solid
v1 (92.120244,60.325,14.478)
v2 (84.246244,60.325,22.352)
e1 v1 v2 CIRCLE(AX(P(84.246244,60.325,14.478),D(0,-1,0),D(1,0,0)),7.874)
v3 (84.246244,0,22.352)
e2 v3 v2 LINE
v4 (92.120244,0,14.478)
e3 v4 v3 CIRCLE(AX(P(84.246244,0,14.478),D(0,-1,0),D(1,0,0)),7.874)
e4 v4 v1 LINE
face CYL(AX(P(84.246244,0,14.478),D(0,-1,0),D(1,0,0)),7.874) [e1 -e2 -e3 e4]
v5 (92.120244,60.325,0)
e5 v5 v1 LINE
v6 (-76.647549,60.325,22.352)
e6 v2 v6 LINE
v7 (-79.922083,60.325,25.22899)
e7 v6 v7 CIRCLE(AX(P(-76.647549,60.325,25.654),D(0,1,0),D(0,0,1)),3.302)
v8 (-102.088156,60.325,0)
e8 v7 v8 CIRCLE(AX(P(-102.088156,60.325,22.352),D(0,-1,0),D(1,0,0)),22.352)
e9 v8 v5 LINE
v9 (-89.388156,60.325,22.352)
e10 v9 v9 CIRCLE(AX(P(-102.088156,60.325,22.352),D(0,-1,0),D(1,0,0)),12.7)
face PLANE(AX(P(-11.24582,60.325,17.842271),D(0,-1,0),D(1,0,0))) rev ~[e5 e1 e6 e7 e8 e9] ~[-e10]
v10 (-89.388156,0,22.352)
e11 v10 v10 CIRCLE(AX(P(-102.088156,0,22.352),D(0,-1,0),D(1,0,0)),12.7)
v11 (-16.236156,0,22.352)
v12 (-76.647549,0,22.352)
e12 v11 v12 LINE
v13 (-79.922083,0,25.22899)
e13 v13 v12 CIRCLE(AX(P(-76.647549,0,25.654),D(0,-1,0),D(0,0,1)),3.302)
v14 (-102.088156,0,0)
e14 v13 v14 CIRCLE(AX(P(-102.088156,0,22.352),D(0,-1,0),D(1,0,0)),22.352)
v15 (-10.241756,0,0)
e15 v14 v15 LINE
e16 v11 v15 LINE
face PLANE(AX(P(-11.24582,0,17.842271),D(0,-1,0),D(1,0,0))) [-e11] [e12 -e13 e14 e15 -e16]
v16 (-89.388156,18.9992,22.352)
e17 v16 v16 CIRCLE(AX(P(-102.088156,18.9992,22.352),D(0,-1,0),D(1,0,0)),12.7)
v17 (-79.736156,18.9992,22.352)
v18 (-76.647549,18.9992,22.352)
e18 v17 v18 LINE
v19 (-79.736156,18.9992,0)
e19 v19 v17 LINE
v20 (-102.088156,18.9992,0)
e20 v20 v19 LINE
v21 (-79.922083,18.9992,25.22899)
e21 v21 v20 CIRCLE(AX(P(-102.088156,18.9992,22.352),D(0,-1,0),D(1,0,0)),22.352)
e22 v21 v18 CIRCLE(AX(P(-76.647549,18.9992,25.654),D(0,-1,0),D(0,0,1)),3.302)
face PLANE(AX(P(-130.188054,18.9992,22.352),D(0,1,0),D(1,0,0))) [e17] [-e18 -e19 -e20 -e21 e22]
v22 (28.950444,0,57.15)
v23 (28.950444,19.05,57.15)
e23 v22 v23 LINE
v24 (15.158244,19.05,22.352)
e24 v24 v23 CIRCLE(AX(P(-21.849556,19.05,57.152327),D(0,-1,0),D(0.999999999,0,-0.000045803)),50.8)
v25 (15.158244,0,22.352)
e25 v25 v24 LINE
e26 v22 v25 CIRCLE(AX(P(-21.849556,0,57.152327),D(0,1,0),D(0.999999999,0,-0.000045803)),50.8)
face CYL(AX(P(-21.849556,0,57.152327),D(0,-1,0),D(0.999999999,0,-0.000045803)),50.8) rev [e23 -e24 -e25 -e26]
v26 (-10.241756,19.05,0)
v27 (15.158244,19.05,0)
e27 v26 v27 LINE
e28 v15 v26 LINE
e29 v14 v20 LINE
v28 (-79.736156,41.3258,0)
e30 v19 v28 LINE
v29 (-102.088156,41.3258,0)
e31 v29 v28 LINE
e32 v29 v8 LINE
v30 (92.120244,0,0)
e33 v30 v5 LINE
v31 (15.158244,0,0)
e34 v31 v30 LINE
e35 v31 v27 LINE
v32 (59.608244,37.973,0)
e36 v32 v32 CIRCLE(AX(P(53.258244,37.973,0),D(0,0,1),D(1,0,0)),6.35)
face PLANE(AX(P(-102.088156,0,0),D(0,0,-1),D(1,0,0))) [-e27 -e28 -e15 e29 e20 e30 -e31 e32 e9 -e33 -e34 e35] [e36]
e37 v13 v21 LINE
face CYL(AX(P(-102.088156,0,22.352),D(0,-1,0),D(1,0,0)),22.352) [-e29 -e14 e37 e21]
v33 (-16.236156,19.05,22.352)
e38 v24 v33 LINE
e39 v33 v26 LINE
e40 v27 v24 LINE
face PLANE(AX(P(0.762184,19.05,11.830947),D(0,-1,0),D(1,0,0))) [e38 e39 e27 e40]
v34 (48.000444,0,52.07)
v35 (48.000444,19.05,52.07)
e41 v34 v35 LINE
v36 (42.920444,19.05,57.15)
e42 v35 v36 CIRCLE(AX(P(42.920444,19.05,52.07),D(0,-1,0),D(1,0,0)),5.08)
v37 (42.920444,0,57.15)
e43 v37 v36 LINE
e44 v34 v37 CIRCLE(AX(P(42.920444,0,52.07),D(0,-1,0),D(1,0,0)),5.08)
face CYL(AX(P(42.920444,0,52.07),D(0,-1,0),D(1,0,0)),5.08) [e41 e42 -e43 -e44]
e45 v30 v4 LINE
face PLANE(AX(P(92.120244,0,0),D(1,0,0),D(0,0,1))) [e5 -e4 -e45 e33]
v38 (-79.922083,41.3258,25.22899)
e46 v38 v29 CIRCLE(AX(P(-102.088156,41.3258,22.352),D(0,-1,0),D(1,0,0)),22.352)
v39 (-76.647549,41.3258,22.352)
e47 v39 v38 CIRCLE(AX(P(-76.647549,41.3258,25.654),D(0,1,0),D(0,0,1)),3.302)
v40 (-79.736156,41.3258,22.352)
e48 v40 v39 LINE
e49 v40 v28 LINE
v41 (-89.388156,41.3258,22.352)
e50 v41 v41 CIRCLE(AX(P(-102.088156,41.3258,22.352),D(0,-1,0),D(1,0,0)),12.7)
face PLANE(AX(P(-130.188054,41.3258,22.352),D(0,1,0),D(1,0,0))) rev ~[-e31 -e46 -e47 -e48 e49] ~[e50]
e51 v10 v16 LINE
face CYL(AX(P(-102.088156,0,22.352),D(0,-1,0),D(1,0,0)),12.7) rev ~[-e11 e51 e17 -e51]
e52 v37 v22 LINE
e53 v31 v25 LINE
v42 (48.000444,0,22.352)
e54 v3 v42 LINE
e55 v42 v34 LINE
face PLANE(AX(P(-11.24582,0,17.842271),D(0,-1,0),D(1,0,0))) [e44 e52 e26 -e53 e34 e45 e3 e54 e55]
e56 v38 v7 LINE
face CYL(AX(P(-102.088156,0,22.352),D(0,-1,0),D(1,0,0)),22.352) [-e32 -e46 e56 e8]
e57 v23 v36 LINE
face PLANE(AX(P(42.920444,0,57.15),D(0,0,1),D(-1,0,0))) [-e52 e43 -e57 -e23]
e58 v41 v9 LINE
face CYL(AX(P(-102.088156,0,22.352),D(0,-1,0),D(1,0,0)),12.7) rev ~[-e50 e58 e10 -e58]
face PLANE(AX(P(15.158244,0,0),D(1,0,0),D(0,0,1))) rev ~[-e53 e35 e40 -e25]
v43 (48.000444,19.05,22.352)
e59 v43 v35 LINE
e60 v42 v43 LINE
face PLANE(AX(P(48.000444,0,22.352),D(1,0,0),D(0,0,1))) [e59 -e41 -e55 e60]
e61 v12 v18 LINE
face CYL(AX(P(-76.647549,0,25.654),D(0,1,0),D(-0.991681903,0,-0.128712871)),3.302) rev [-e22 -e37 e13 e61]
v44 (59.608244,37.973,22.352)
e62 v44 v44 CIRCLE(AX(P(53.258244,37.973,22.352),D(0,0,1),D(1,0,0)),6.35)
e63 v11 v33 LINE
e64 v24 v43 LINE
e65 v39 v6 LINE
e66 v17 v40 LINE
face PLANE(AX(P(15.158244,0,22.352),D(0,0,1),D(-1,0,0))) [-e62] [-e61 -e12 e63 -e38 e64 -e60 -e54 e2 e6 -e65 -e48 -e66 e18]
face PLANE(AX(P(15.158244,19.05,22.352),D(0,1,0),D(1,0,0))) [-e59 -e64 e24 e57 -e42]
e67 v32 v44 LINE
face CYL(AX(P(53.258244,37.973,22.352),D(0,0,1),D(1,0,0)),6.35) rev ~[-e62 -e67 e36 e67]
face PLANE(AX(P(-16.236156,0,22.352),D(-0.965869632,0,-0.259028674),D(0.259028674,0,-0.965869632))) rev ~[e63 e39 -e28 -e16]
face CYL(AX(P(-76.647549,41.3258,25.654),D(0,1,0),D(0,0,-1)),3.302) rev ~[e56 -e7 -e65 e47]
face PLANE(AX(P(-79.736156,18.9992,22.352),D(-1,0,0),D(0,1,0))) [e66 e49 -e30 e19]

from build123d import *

# Parameters (mm, degrees)
F0_R     = 12.7
F1_DEPTH = 60.325
F3_W     = 32.8422
F3_H     = 41.275
F6_DEPTH = 34.798
F7_DEPTH = 19.05
F5_W     = 50.4518977821
F5_H     = 22.3266
F5_R     = 6.35
F8_DEPTH = 47.498
F9_R     = 3.302


with BuildPart() as f1:
    # F0 (on Front) → F1 (new body)
    with BuildSketch(Plane.XZ):
        with BuildLine():
            ThreePointArc((-79.7361564685, 22.352), (-117.8934072416, 38.1572507731), (-102.0881564685, 0))
            Line((-102.0881564685, 0), (92.1202435315, 0))
            Line((92.1202435315, 0), (92.1202435315, 14.478))
            ThreePointArc((92.1202435315, 14.478), (89.8140023266, 20.0457587951), (84.2462435315, 22.352))
            Line((84.2462435315, 22.352), (48.0004435315, 22.352))
            Line((48.0004435315, 22.352), (48.0004435315, 52.07))
            ThreePointArc((48.0004435315, 52.07), (46.5125459799, 55.6621024484), (42.9204435315, 57.15))
            Line((42.9204435315, 57.15), (28.9504435315, 57.15))
            ThreePointArc((28.9504435315, 57.15), (25.3762588931, 38.4343576341), (15.1582435315, 22.352))
            Line((15.1582435315, 22.352), (-79.7361564685, 22.352))
        make_face()
        with Locations((-102.0881564685, 22.352)):
            Circle(F0_R, mode=Mode.SUBTRACT)
    extrude(amount=-F1_DEPTH)

    # F3 (on offset) → F6 (cut, through all)
    with BuildSketch(Plane.XY.offset(22.352)):
        with Locations((31.5793435315, 39.6875)):
            Rectangle(F3_W, F3_H)
    extrude(amount=F6_DEPTH, mode=Mode.SUBTRACT)

    # F4 (on Front) → F7 (cut)
    with BuildSketch(Plane.XZ):
        Polygon((15.1582435315, 0), (15.1582435315, 22.352), (-16.2361564685, 22.352), (-10.2417564685, 0), align=None)
    extrude(amount=-F7_DEPTH, mode=Mode.SUBTRACT)

    # F5 (on offset) → F8 (cut, symmetric)
    with BuildSketch(Plane.XY.offset(22.352)):
        with Locations((-104.9621053595, 30.1625)):
            Rectangle(F5_W, F5_H)
        with Locations((53.2582435315, 37.973)):
            Circle(F5_R)
    extrude(amount=F8_DEPTH, both=True, mode=Mode.SUBTRACT)

    # F9
    f9_edges = [f1.edges().sort_by_distance(p)[0] for p in [
        (-79.736156, 9.4996, 22.352),
        (-79.736156, 50.8254, 22.352),
    ]]
    fillet(f9_edges, radius=F9_R)


solid = f1.part
